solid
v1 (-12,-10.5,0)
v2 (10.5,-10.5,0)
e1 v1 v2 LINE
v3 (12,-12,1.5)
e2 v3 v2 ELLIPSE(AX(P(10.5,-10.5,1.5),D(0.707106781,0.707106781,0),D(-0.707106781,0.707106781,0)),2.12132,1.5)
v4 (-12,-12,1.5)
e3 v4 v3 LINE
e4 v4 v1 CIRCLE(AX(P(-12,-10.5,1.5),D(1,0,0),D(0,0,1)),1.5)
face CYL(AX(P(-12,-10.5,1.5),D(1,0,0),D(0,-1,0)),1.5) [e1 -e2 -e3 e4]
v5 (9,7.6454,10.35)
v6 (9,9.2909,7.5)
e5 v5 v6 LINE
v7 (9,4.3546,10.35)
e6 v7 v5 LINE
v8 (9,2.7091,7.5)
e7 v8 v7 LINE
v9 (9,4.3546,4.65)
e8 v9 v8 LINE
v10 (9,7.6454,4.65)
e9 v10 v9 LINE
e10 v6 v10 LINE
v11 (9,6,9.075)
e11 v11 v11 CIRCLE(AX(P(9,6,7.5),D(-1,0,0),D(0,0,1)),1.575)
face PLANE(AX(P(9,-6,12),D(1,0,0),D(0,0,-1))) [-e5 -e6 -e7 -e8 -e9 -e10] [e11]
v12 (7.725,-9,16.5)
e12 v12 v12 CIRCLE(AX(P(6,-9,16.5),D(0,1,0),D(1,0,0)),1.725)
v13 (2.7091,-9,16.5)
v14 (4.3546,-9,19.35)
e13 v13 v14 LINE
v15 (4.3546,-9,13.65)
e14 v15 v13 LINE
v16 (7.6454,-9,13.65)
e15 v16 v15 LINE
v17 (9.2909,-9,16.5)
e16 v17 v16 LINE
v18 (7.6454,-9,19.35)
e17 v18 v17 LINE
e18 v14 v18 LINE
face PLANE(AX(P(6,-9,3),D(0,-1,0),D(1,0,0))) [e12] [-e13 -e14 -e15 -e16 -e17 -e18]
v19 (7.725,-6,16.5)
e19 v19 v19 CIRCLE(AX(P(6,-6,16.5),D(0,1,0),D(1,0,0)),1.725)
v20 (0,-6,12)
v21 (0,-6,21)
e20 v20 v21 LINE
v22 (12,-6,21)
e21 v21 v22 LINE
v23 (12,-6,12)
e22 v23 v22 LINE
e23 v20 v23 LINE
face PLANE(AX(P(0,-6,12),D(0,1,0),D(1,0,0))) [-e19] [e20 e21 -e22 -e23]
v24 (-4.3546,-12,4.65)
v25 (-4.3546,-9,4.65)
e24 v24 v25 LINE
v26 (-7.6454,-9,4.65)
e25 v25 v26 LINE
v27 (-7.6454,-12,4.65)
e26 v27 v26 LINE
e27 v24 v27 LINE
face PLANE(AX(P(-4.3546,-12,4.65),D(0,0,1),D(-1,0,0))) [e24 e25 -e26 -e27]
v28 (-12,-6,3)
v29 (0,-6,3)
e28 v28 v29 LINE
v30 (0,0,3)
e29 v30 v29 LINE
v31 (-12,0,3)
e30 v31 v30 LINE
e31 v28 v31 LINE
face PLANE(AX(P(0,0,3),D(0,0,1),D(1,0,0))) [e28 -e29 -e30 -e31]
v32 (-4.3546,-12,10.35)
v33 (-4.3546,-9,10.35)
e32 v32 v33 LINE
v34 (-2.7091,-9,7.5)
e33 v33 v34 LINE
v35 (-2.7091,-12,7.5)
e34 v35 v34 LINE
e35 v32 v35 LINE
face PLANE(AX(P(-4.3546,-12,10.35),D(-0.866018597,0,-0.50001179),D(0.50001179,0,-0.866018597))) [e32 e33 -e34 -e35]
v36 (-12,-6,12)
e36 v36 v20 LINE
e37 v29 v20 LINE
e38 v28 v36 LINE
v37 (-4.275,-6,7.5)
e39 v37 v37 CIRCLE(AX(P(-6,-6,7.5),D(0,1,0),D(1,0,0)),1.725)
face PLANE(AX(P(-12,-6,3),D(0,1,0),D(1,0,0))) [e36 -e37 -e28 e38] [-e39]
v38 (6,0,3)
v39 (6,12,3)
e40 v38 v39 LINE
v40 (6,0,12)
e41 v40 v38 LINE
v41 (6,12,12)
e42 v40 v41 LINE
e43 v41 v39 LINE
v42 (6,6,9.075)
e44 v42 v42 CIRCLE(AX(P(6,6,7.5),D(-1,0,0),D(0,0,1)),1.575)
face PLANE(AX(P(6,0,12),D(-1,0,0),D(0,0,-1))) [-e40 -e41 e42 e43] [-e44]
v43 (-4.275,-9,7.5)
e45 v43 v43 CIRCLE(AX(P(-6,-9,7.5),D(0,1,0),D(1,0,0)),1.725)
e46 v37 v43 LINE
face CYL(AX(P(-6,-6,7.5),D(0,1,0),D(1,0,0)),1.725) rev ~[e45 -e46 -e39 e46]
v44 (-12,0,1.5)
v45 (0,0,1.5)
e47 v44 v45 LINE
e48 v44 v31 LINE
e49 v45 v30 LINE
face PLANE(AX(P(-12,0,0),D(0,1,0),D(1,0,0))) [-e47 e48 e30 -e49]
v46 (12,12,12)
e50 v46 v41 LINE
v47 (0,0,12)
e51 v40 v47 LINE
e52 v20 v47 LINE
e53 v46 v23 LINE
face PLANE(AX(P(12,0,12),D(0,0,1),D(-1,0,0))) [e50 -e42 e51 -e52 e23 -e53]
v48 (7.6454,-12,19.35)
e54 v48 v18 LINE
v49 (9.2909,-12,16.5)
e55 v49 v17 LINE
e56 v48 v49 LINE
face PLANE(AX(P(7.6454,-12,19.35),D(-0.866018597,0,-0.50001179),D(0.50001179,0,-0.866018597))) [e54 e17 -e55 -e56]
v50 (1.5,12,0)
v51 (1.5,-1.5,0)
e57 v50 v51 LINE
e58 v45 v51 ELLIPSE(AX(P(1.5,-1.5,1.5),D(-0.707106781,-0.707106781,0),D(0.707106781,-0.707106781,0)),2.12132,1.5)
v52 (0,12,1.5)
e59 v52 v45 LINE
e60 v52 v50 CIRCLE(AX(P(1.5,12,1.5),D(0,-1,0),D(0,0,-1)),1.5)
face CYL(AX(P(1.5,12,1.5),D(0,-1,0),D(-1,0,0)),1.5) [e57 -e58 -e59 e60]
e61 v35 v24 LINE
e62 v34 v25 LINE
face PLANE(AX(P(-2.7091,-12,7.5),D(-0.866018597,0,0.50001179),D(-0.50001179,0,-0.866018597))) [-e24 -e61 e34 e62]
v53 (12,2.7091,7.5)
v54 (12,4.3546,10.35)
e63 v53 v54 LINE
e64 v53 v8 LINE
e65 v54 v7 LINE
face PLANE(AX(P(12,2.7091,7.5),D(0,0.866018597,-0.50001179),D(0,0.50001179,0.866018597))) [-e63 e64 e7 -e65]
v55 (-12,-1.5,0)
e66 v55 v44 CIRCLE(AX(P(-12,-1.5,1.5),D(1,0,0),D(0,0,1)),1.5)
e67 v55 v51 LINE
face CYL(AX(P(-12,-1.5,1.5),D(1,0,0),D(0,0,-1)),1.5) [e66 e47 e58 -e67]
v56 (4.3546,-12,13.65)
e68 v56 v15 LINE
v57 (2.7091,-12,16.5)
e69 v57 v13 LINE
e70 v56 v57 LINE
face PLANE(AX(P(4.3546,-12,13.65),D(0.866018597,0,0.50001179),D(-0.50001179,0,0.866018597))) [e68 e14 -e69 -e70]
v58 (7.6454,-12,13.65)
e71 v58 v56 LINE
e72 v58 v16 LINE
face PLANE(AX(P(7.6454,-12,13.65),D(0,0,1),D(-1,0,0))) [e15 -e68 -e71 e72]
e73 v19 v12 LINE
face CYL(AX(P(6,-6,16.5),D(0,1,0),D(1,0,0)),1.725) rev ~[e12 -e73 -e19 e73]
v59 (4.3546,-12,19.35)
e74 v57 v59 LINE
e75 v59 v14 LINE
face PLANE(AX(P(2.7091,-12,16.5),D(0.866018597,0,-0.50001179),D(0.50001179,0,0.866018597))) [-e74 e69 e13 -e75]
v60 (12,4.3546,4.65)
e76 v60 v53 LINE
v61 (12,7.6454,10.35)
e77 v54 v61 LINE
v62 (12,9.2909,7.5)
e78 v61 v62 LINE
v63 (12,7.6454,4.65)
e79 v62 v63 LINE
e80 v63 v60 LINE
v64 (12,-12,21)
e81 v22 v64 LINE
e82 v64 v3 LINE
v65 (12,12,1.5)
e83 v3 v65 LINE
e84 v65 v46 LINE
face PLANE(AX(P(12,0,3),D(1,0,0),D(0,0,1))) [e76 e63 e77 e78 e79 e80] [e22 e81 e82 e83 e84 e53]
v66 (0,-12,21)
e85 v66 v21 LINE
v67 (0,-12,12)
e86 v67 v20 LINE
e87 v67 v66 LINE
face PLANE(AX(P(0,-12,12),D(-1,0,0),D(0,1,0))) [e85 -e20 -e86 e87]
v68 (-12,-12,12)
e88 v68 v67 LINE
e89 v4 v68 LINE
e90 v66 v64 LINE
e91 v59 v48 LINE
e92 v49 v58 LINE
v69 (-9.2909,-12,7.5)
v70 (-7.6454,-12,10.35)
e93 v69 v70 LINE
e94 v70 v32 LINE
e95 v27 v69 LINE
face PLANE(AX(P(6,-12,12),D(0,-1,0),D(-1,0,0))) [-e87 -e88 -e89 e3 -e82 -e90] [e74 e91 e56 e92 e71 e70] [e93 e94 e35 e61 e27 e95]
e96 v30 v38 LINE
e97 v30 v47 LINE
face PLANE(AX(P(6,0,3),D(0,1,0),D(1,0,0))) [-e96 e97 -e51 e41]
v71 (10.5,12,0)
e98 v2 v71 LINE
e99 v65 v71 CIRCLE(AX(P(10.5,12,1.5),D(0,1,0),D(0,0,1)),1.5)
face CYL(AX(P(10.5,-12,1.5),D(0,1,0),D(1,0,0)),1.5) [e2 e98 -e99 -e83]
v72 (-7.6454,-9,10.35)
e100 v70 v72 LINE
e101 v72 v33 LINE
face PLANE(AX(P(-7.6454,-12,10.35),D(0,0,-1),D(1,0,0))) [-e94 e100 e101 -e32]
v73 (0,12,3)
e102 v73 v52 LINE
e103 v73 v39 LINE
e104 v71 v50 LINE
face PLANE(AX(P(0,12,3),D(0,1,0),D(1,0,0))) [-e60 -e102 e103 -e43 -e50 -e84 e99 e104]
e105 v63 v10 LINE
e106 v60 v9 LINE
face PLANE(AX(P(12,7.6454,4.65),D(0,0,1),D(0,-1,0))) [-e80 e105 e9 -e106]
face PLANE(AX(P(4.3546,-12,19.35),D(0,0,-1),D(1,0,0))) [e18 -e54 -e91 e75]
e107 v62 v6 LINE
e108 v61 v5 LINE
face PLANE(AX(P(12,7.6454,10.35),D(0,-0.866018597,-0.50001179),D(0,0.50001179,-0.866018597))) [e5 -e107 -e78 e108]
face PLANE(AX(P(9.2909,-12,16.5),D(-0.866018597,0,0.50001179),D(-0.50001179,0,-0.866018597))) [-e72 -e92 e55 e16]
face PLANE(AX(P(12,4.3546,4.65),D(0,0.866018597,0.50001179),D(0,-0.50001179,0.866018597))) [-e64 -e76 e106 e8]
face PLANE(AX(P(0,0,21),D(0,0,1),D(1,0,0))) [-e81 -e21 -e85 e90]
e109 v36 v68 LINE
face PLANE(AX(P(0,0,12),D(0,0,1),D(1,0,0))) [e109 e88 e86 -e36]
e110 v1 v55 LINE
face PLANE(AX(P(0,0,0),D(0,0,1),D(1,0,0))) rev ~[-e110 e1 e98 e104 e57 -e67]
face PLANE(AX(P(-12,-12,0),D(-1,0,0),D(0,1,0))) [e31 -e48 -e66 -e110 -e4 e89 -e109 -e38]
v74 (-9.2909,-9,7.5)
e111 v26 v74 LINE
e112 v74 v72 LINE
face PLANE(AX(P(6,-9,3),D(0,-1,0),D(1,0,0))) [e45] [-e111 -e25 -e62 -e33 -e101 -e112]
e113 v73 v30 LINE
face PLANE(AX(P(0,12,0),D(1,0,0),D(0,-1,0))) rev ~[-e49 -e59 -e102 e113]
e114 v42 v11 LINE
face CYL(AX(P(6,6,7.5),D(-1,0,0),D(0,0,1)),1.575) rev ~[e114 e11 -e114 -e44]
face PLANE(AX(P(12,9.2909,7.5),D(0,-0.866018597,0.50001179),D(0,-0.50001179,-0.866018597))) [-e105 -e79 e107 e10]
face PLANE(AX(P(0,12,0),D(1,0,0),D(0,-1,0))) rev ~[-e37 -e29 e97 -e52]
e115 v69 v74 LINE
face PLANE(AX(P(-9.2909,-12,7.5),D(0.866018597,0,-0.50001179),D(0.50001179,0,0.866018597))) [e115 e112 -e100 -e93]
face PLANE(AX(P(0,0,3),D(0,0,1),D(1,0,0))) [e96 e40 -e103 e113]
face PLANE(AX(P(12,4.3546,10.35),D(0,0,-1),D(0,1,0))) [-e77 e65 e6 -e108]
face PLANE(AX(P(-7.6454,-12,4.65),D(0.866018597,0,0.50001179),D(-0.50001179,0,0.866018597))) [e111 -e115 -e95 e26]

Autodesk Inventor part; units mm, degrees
ref_plane "YZ Plane" through (0, 0, 0) normal (1, 0, 0) x (0, 1, 0)
ref_plane "XZ Plane" through (0, 0, 0) normal (0, 1, 0) x (-1, 0, 0)
ref_plane "XY Plane" through (0, 0, 0) normal (0, 0, 1) x (1, 0, 0)
sketch "Sketch1" plane through (0, 0, 0) normal (0, 0, 1) x (1, 0, 0)
  line L0 (0, 0) -> (12, 0)
  line L1 (12, 0) -> (12, 12)
  line L2 (12, 12) -> (0, 12)
  line L3 (0, 12) -> (0, 0)
  line L4 (12, 0) -> (0, 0)
  line L5 (0, 0) -> (0, -12)
  line L6 (0, -12) -> (12, -12)
  line L7 (12, -12) -> (12, 0)
  line L8 (12, 0) -> (24, 0)
  line L9 (24, 0) -> (24, -12)
  line L10 (24, -12) -> (12, -12)
  line L11 (12, -12) -> (12, 0)
  line L12 (0, -12) -> (-12, -12)
  line L13 (-12, -12) -> (-12, 0)
  line L14 (-12, 0) -> (0, 0)
  line L15 (0, 0) -> (0, -12)
  line L16 (0, -12) -> (12, -12)
  line L17 (12, -12) -> (12, -24)
  line L18 (12, -24) -> (0, -24)
  line L19 (0, -24) -> (0, -12)
  dimension "d0" = 12
  dimension "d1" = 12
  dimension "d2" = 12
  dimension "d3" = 12
  dimension "d4" = 12
  dimension "d5" = 12
  dimension "d6" = 12
  dimension "d7" = 12
  dimension "d8" = 12
  dimension "d9" = 12
extrude "Extrusion1" add sketch "Sketch1" along normal blind 3
sketch "Sketch2" plane through (0, 0, 3) normal (0, 0, 1) x (1, 0, 0)
  line L0 (-12, 0) -> (-12, -12) projected
  line L1 (-12, -12) -> (-12, -6)
  line L2 (-12, -6) -> (0, -6)
  line L3 (-12, -12) -> (0, -12) projected
  line L4 (0, -6) -> (0, -12)
  line L5 (0, -12) -> (-12, -12)
  line L6 (12, -24) -> (12, -12) projected
  line L7 (12, -12) -> (12, -6)
  line L8 (12, -6) -> (24, -6)
  line L9 (24, -12) -> (24, 0) projected
  line L10 (12, -12) -> (24, -12) projected
  line L11 (24, -6) -> (24, -12)
  line L12 (24, -12) -> (12, -12)
  line L13 (0, 0) -> (0, -6)
  line L14 (12, 0) -> (12, 12) projected
  line L15 (0, 0) -> (12, 0)
  line L16 (12, 0) -> (12, -6)
  line L17 (12, -12) -> (0, -12)
  line L18 (0, 12) -> (0, 0) projected
  line L19 (0, 0) -> (0, 12)
  line L20 (0, 12) -> (6, 12)
  line L21 (12, 12) -> (0, 12) projected
  line L22 (6, 12) -> (6, 0)
  line L23 (6, 0) -> (0, 0)
  line L24 (0, -12) -> (0, -24) projected
  line L25 (0, -12) -> (0, -24)
  line L26 (0, -24) -> (6, -24)
  line L27 (0, -24) -> (12, -24) projected
  line L28 (6, -24) -> (6, -12)
  line L29 (6, -12) -> (0, -12)
  dimension "d12" = 6
  dimension "d13" = 12
extrude "Extrusion2" add sketch "Sketch2" along normal blind 9 contours L2 L4 L3 L0 | L13 L15 L16 L7 L17 L4 | L17 L28 L26 L24 | L18 L20 L22 L15 | L7 L8 L9 L10
sketch "Sketch3" plane through (0, 0, 12) normal (0, 0, 1) x (1, 0, 0)
  line L0 (0, -6) -> (12, -6)
  line L1 (12, -12) -> (6, -12) projected
  line L2 (12, -6) -> (12, -12)
  line L3 (0, -12) -> (0, -24) projected
  line L4 (12, -12) -> (0, -12)
  line L5 (0, -12) -> (0, -6)
  point P0 (0, 0)
extrude "Extrusion3" add sketch "Sketch3" along normal blind 9
sketch "Sketch4" plane through (6, -12, 3) normal (0, -1, 0) x (1, 0, 0)
  point P0 (-6, -3)
sketch "Sketch5" plane through (-12, -6, 3) normal (0, 1, 0) x (1, 0, 0)
  circle A0 centre (6, -4.5) radius 1.725
  line L0 (0, 0) -> (0, -9) projected
  line L1 (12, -9) -> (0, -9) projected
  circle A1 centre (18, -13.5) radius 1.725
  line L2 (24, -18) -> (12, -18) projected
  line L3 (24, -9) -> (24, -18) projected
  circle A2 centre (30, -4.5) radius 1.725
  line L4 (36, 0) -> (36, -9) projected
  line L5 (36, -9) -> (24, -9) projected
  point P0 (12, 3)
  dimension "d19" = 3.45
  dimension "d20" = 6
  dimension "d21" = 4.5
  dimension "d22" = 3.45
  dimension "d23" = 4.5
  dimension "d24" = 6
  dimension "d25" = 3.45
  dimension "d26" = 6
  dimension "d27" = 4.5
extrude "Extrusion4" cut sketch "Sketch5" against normal blind 3
sketch "Sketch6" plane through (6, -12, 3) normal (0, -1, 0) x (1, 0, 0)
  circle A0 centre (-12, 4.5) radius 1.725 projected
  line L0 (-10.3546, 7.35) -> (-8.7091, 4.5)
  line L1 (-8.7091, 4.5) -> (-10.3546, 1.65)
  line L2 (-10.3546, 1.65) -> (-13.6454, 1.65)
  line L3 (-13.6454, 1.65) -> (-15.2909, 4.5)
  line L4 (-15.2909, 4.5) -> (-13.6454, 7.35)
  line L5 (-13.6454, 7.35) -> (-10.3546, 7.35)
  circle A1 centre (12, 4.5) radius 1.725 projected
  line L6 (13.6454, 7.35) -> (15.2909, 4.5)
  line L7 (15.2909, 4.5) -> (13.6454, 1.65)
  line L8 (13.6454, 1.65) -> (10.3546, 1.65)
  line L9 (10.3546, 1.65) -> (8.7091, 4.5)
  line L10 (8.7091, 4.5) -> (10.3546, 7.35)
  line L11 (10.3546, 7.35) -> (13.6454, 7.35)
  circle A2 centre (0, 13.5) radius 1.725 projected
  line L12 (1.6454, 16.35) -> (3.2909, 13.5)
  line L13 (3.2909, 13.5) -> (1.6454, 10.65)
  line L14 (1.6454, 10.65) -> (-1.6454, 10.65)
  line L15 (-1.6454, 10.65) -> (-3.2909, 13.5)
  line L16 (-3.2909, 13.5) -> (-1.6454, 16.35)
  line L17 (-1.6454, 16.35) -> (1.6454, 16.35)
  point P0 (-6, -3)
  dimension "d30" = 2.85
  dimension "d31" = 2.85
  dimension "d32" = 2.85
extrude "Extrusion5" cut sketch "Sketch6" against normal blind 3 contours A0 | L0 L1 L2 L3 L4 L5 | A1 | L6 L7 L8 L9 L10 L11 | A2 | L12 L13 L14 L15 L16 L17
sketch "Sketch7" plane through (6, 0, 3) normal (1, 0, 0) x (0, 0, -1)
  circle A0 centre (-4.5, 6) radius 1.725
  circle A1 centre (-4.5, -18) radius 1.725
  line L0 (-9, 0) -> (-9, 12) projected
  line L1 (-9, -24) -> (-9, -12) projected
  line L2 (0, -24) -> (-9, -24) projected
  line L3 (0, 12) -> (-9, 12) projected
  point P0 (3, 0)
  dimension "d35" = 3.45
  dimension "d36" = 3.45
  dimension "d37" = 4.5
  dimension "d38" = 4.5
  dimension "d39" = 6
  dimension "d40" = 6
extrude "Extrusion6" cut sketch "Sketch7" against normal blind 3
sketch "Sketch8" plane through (0, -6, 3) normal (-1, 0, 0) x (0, 0, 1)
  circle A0 centre (4.5, 12) radius 1.725 projected
  line L0 (1.65, 13.6454) -> (4.5, 15.2909)
  line L1 (4.5, 15.2909) -> (7.35, 13.6454)
  line L2 (7.35, 13.6454) -> (7.35, 10.3546)
  line L3 (7.35, 10.3546) -> (4.5, 8.7091)
  line L4 (4.5, 8.7091) -> (1.65, 10.3546)
  line L5 (1.65, 10.3546) -> (1.65, 13.6454)
  circle A1 centre (4.5, -12) radius 1.725 projected
  line L6 (1.65, -10.3546) -> (4.5, -8.7091)
  line L7 (4.5, -8.7091) -> (7.35, -10.3546)
  line L8 (7.35, -10.3546) -> (7.35, -13.6454)
  line L9 (7.35, -13.6454) -> (4.5, -15.2909)
  line L10 (4.5, -15.2909) -> (1.65, -13.6454)
  line L11 (1.65, -13.6454) -> (1.65, -10.3546)
  point P0 (-3, 6)
  dimension "d43" = 2.85
  dimension "d44" = 2.85
extrude "Extrusion7" cut sketch "Sketch8" against normal blind 3 contours A0 | L0 L1 L2 L3 L4 L5 | A1 | L6 L7 L8 L9 L10 L11
sketch "Sketch9" plane through (0, 0, 0) normal (0, 0, -1) x (-1, 0, 0)
  line L0 (-24, -12) -> (-24, 0) projected
  line L1 (-12, -12) -> (-12, -6) projected
  line L2 (-24, 0) -> (-12, 0)
  line L3 (-12, 0) -> (-12, -12)
  line L4 (-12, -12) -> (-24, -12)
  line L5 (-24, -12) -> (-24, 0)
  line L6 (-12, -12) -> (0, -12)
  line L7 (0, -12) -> (0, -24)
  line L8 (0, -24) -> (-12, -24)
  line L9 (-12, -24) -> (-12, -12)
  point P0 (0, 0)
extrude "Extrusion8" cut sketch "Sketch9" against normal through all
fillet "Fillet2" radius 1.5 4 edges at (12, 0, 0) (0, 6, 0) (-6, 0, 0) (0, -12, 0)
sketch "Sketch10" plane through (0, 12, 12) normal (0, 1, 0) x (1, 0, 0)
  line L0 (6, 0) -> (0, 0) projected
  line L1 (12, 9) -> (6, 9) projected
  line L2 (0, 0) -> (6, 0)
  line L3 (6, 0) -> (6, 9)
  line L4 (6, 9) -> (0, 9)
  line L5 (0, 9) -> (0, 0)
  point P0 (0, 12)
extrude "Extrusion9" cut sketch "Sketch10" against normal blind 12
sketch "Sketch11" plane through (0, 0, 3) normal (0, 1, 0) x (1, 0, 0)
  line L0 (12, 0) -> (12, -9) projected
  line L1 (12, 0) -> (0, 0) projected
  line L2 (12, -9) -> (6, -9)
  line L3 (6, -9) -> (6, 0)
  line L4 (6, 0) -> (12, 0)
  line L5 (12, 0) -> (12, -9)
  point P0 (0, 3)
extrude "Extrusion10" add sketch "Sketch11" along normal blind 12
sketch "Sketch12" plane through (6, 0, 3) normal (-1, 0, 0) x (0, 0, 1)
  circle A0 centre (4.5, 6) radius 1.575
  line L0 (9, 0) -> (9, 12) projected
  line L1 (0, 12) -> (9, 12) projected
  point P0 (-3, 0)
  dimension "d54" = 3.15
  dimension "d55" = 4.5
  dimension "d56" = 6
extrude "Extrusion11" cut sketch "Sketch12" against normal blind 3
sketch "Sketch13" plane through (12, -6, 12) normal (1, 0, 0) x (0, 0, -1)
  circle A0 centre (4.5, 12) radius 1.575 projected
  line L0 (1.65, 13.6454) -> (4.5, 15.2909)
  line L1 (4.5, 15.2909) -> (7.35, 13.6454)
  line L2 (7.35, 13.6454) -> (7.35, 10.3546)
  line L3 (7.35, 10.3546) -> (4.5, 8.7091)
  line L4 (4.5, 8.7091) -> (1.65, 10.3546)
  line L5 (1.65, 10.3546) -> (1.65, 13.6454)
  point P0 (12, 6)
  dimension "d59" = 5.7
extrude "Extrusion12" cut sketch "Sketch13" against normal blind 3 contours A0 | L0 L1 L2 L3 L4 L5
properties part number "twoWayNEVer1"
